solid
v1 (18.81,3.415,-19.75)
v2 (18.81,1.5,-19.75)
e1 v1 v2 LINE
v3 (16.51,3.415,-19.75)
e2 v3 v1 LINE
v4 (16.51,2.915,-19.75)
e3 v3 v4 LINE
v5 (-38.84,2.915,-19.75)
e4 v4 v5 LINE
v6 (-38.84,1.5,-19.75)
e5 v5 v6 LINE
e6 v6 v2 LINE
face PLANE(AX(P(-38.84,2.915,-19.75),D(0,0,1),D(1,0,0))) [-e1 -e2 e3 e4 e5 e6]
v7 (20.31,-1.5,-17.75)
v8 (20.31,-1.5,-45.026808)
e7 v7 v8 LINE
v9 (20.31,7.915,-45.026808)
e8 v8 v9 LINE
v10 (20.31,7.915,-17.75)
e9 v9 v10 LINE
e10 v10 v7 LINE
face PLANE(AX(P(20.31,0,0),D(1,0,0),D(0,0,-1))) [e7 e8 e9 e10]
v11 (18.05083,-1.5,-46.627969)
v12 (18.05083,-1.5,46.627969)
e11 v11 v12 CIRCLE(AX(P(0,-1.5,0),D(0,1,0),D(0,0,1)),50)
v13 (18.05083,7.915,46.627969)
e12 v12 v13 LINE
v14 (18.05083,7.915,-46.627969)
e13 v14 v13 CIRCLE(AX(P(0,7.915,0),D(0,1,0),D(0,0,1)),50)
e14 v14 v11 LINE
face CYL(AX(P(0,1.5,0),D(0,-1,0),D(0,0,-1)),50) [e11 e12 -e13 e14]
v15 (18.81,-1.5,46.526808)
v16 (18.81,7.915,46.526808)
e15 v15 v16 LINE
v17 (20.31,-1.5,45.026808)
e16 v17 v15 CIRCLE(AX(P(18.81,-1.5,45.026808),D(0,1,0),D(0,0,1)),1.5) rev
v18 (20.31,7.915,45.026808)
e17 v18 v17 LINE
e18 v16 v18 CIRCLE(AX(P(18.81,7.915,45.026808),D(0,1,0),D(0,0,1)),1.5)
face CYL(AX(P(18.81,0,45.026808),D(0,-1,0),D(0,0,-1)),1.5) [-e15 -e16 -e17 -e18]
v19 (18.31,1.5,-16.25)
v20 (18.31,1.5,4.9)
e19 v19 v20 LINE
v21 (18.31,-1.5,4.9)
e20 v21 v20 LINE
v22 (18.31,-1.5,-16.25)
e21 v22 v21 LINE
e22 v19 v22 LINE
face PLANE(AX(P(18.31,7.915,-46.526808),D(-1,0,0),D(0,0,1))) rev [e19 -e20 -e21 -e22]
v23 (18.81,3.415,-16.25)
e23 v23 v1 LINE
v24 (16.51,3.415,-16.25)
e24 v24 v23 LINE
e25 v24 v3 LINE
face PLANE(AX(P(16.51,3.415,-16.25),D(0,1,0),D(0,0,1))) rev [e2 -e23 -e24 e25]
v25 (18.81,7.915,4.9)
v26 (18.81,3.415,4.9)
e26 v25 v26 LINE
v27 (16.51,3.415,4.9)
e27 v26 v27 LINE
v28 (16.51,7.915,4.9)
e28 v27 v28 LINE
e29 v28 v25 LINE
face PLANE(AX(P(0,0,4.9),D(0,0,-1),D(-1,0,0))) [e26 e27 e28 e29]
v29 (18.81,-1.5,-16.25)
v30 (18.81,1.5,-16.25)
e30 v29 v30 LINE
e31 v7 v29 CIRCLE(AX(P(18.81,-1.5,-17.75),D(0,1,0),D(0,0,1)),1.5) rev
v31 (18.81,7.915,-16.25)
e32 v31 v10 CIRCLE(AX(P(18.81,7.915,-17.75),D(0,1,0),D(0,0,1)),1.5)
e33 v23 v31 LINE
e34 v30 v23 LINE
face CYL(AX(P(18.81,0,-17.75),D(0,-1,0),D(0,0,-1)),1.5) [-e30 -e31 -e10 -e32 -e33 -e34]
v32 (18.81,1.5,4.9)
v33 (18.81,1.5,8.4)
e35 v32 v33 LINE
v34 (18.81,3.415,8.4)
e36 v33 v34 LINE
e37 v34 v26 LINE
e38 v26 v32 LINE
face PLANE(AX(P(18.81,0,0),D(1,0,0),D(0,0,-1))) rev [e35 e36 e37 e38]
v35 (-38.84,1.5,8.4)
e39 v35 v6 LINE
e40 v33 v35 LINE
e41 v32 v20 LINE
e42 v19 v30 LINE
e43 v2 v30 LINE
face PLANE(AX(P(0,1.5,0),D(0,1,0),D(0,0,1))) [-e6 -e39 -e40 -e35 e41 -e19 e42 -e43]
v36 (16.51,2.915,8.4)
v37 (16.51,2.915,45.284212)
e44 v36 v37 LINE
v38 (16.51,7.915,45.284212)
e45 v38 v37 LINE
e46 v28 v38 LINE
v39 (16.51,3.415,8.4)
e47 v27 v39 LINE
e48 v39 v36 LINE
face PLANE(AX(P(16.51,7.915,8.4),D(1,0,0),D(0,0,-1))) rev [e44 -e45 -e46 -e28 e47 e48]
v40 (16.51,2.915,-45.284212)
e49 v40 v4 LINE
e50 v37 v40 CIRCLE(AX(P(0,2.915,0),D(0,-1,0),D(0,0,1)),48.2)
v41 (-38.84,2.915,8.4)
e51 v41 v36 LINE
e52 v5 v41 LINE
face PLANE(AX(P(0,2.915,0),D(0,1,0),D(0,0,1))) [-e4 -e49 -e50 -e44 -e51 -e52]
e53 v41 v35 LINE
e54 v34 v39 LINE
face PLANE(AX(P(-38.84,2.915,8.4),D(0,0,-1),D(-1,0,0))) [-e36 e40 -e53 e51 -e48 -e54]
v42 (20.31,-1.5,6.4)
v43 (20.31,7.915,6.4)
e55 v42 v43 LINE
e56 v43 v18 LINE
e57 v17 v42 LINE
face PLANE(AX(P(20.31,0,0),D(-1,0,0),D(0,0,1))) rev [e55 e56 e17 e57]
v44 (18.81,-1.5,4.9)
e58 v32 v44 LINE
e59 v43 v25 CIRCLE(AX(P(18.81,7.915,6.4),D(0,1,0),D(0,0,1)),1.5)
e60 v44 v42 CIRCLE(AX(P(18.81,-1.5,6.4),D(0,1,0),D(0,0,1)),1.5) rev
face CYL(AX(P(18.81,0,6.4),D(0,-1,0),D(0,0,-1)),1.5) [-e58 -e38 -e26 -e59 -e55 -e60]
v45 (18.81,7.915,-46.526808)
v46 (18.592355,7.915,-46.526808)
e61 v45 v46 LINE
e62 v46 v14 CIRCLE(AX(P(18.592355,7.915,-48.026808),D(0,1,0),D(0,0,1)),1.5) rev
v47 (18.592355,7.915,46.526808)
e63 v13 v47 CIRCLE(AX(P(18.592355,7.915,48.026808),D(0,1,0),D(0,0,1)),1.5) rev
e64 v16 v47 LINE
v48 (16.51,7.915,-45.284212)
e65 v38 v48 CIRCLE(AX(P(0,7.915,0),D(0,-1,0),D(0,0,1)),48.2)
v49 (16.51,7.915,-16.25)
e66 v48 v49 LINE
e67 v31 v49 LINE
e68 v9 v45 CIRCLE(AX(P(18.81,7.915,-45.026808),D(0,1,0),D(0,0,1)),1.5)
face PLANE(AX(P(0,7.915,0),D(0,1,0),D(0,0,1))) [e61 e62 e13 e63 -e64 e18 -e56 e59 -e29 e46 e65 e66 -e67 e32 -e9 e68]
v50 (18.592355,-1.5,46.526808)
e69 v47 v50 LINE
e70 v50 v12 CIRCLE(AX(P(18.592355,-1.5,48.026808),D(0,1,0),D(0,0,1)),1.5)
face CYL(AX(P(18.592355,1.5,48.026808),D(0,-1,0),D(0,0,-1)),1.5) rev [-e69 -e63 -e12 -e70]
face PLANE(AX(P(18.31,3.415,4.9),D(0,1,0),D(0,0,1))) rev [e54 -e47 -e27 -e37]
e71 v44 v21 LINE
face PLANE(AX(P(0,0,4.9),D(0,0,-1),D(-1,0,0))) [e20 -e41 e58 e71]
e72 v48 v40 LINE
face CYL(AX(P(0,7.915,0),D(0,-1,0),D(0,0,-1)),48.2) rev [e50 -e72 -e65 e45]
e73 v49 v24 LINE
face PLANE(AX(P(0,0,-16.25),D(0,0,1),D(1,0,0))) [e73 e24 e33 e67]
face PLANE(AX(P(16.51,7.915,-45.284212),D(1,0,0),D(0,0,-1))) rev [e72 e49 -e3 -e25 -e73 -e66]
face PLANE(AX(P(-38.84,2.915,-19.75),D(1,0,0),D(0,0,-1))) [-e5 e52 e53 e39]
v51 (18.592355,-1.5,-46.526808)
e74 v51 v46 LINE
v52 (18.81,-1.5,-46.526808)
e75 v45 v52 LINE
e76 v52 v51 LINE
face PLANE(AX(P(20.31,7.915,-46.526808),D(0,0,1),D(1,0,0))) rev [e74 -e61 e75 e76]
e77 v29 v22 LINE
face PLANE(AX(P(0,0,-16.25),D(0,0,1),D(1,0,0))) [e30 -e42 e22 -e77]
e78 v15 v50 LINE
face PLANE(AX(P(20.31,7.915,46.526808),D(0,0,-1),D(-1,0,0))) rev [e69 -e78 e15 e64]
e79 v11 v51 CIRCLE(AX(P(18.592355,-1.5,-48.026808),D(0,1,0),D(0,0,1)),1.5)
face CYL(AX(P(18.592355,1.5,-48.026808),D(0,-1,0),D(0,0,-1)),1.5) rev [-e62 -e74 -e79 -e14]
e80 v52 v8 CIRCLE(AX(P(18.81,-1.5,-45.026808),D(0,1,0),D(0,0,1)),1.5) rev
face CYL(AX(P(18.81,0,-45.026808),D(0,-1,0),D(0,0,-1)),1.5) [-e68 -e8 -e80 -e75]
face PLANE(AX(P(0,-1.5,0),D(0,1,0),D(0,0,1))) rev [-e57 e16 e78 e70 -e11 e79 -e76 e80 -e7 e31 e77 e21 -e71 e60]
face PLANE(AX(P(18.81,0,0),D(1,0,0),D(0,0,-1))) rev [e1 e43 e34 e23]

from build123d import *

# Parameters (mm, degrees)
SKETCH1_R               = 50
BOSS_EXTRUDE1_DEPTH     = 1.5
SKETCH2_R               = 50
SKETCH2_W               = 57.15
SKETCH2_H               = 28.15
BOSS_EXTRUDE2_DEPTH     = 1.415
BOSS_EXTRUDE3_START     = 5
BOSS_EXTRUDE3_DEPTH     = 5
CUT_EXTRUDE1_DEPTH      = 71.887234394
CUT_EXTRUDE1_DEPTH_BACK = 71.887234394
SKETCH6_W               = 1.8
SKETCH6_H               = 4.5
BOSS_EXTRUDE4_DEPTH     = 3.5
SKETCH7_W               = 1.8
SKETCH7_H               = 4.5
BOSS_EXTRUDE5_DEPTH     = 3.5
SKETCH8_W               = 30.276808401
SKETCH8_H               = 9.415
SKETCH8_W_2             = 41.626808401
BOSS_EXTRUDE6_DEPTH     = 2
SKETCH9_W               = 28.15
SKETCH9_H               = 1.915
CUT_EXTRUDE3_DEPTH      = 0.5
FILLET1_START           = -2
FILLET1_DEPTH           = 11
FILLET1_START_2         = -1.5
FILLET1_2_DEPTH         = 9.415


with BuildPart() as part:
    # Sketch1 → Boss-Extrude1 (new, symmetric)
    with BuildSketch(Plane(origin=(0, 0, 0), x_dir=(1, 0, 0), z_dir=(0, 1, 0))):
        with Locations(Location((0, 0, 0), (0, 0, 270))):
            Circle(SKETCH1_R)
    extrude(amount=BOSS_EXTRUDE1_DEPTH, both=True)

    # Sketch2 → Boss-Extrude2 (add, symmetric)
    with BuildSketch(Plane(origin=(0, 1.5, 0), x_dir=(1, 0, 0), z_dir=(0, 1, 0))):
        with Locations(Location((0, 0, 0), (0, 0, 270))):
            Circle(SKETCH2_R)
        with Locations((-10.265, 5.675)):
            Rectangle(SKETCH2_W, SKETCH2_H, mode=Mode.SUBTRACT)
    extrude(amount=BOSS_EXTRUDE2_DEPTH, both=True)

    # Sketch3 → Boss-Extrude3 (add)
    with BuildSketch(Plane(origin=(0, 2.915, 0), x_dir=(1, 0, 0), z_dir=(0, 1, 0)).offset(BOSS_EXTRUDE3_START)):
        with BuildLine():
            Line((16.51, 45.284212481), (16.51, 19.75))
            Line((16.51, 19.75), (18.31, 19.75))
            Line((18.31, 19.75), (18.31, 46.526808401))
            ThreePointArc((18.31, 46.526808401), (-50, 0), (18.31, -46.526808401))
            Line((18.31, -46.526808401), (18.31, -8.4))
            Line((18.31, -8.4), (16.51, -8.4))
            Line((16.51, -8.4), (16.51, -45.284212481))
            ThreePointArc((16.51, -45.284212481), (-48.2, 0), (16.51, 45.284212481))
        make_face()
    extrude(amount=-BOSS_EXTRUDE3_DEPTH)

    # Sketch4 → Cut-Extrude1 (cut, two sides: drawn at the far end of the back side and taken through both)
    with BuildSketch(Plane(origin=(0, 2.915, 0), x_dir=(1, 0, 0), z_dir=(0, 1, 0)).offset(-CUT_EXTRUDE1_DEPTH_BACK)):
        with BuildLine():
            Line((18.31, -46.526808401), (18.31, 46.526808401))
            ThreePointArc((18.31, 46.526808401), (50, 0), (18.31, -46.526808401))
        make_face()
    extrude(amount=CUT_EXTRUDE1_DEPTH + CUT_EXTRUDE1_DEPTH_BACK, mode=Mode.SUBTRACT)

    # Sketch6 → Boss-Extrude4 (add)
    with BuildSketch(Plane.XY.offset(-19.75)):
        with Locations((17.41, 5.665)):
            Rectangle(SKETCH6_W, SKETCH6_H)
    extrude(amount=BOSS_EXTRUDE4_DEPTH)

    # Sketch7 → Boss-Extrude5 (add)
    with BuildSketch(Plane(origin=(0, 0, 8.4), x_dir=(-1, 0, 0), z_dir=(0, 0, -1))):
        with Locations((-17.41, 5.665)):
            Rectangle(SKETCH7_W, SKETCH7_H)
    extrude(amount=BOSS_EXTRUDE5_DEPTH)

    # Sketch8 → Boss-Extrude6 (add)
    with BuildSketch(Plane(origin=(18.31, 0, 0), x_dir=(0, 0, -1), z_dir=(1, 0, 0))):
        with Locations((31.388404201, 3.2075)):
            Rectangle(SKETCH8_W, SKETCH8_H)
        with Locations((-25.713404201, 3.2075)):
            Rectangle(SKETCH8_W_2, SKETCH8_H)
    extrude(amount=BOSS_EXTRUDE6_DEPTH)

    # Sketch9 → Cut-Extrude3 (cut)
    with BuildSketch(Plane.ZY.offset(-18.31)):
        with Locations((-5.675, 2.4575)):
            Rectangle(SKETCH9_W, SKETCH9_H)
    extrude(amount=-CUT_EXTRUDE3_DEPTH, mode=Mode.SUBTRACT)

    # Fillet1: read off the stored shape, not the designer's step
    # Fillet1 outline → Fillet1 (cut)
    with BuildSketch(Plane(origin=(0, 0, 0), x_dir=(1, 0, 0), z_dir=(0, 1, 0)).offset(FILLET1_START)):
        with BuildLine():
            Line((20.31, -4.9), (18.81, -4.9))
            ThreePointArc((18.81, -4.9), (19.870660172, -5.339339828), (20.31, -6.4))
            Line((20.31, -6.4), (20.31, -4.9))
        make_face()
        with BuildLine():
            Line((20.31, 16.25), (20.31, 17.75))
            ThreePointArc((20.31, 17.75), (19.870660172, 16.689339828), (18.81, 16.25))
            Line((18.81, 16.25), (20.31, 16.25))
        make_face()
        with BuildLine():
            Line((20.31, 46.526808401), (18.81, 46.526808401))
            ThreePointArc((18.81, 46.526808401), (19.870660172, 46.087468573), (20.31, 45.026808401))
            Line((20.31, 45.026808401), (20.31, 46.526808401))
        make_face()
        with BuildLine():
            Line((20.31, -46.526808401), (20.31, -45.026808401))
            ThreePointArc((20.31, -45.026808401), (19.870660172, -46.087468573), (18.81, -46.526808401))
            Line((18.81, -46.526808401), (20.31, -46.526808401))
        make_face()
    extrude(amount=FILLET1_DEPTH, mode=Mode.SUBTRACT)

    # Fillet1 2 outline → Fillet1 2 (add)
    with BuildSketch(Plane(origin=(0, 0, 0), x_dir=(1, 0, 0), z_dir=(0, 1, 0)).offset(FILLET1_START_2)):
        with BuildLine():
            ThreePointArc((18.592355278, 46.526808401), (18.316908931, 46.552315502), (18.050830367, 46.627969322))
            ThreePointArc((18.050830367, 46.627969322), (18.180485544, 46.577569122), (18.31, 46.526808401))
            Line((18.31, 46.526808401), (18.592355278, 46.526808401))
        make_face()
        with BuildLine():
            ThreePointArc((18.050830367, -46.627969322), (18.316908931, -46.552315502), (18.592355278, -46.526808401))
            Line((18.592355278, -46.526808401), (18.31, -46.526808401))
            ThreePointArc((18.31, -46.526808401), (18.180485544, -46.577569122), (18.050830367, -46.627969322))
        make_face()
    extrude(amount=FILLET1_2_DEPTH)


solid = part.part
